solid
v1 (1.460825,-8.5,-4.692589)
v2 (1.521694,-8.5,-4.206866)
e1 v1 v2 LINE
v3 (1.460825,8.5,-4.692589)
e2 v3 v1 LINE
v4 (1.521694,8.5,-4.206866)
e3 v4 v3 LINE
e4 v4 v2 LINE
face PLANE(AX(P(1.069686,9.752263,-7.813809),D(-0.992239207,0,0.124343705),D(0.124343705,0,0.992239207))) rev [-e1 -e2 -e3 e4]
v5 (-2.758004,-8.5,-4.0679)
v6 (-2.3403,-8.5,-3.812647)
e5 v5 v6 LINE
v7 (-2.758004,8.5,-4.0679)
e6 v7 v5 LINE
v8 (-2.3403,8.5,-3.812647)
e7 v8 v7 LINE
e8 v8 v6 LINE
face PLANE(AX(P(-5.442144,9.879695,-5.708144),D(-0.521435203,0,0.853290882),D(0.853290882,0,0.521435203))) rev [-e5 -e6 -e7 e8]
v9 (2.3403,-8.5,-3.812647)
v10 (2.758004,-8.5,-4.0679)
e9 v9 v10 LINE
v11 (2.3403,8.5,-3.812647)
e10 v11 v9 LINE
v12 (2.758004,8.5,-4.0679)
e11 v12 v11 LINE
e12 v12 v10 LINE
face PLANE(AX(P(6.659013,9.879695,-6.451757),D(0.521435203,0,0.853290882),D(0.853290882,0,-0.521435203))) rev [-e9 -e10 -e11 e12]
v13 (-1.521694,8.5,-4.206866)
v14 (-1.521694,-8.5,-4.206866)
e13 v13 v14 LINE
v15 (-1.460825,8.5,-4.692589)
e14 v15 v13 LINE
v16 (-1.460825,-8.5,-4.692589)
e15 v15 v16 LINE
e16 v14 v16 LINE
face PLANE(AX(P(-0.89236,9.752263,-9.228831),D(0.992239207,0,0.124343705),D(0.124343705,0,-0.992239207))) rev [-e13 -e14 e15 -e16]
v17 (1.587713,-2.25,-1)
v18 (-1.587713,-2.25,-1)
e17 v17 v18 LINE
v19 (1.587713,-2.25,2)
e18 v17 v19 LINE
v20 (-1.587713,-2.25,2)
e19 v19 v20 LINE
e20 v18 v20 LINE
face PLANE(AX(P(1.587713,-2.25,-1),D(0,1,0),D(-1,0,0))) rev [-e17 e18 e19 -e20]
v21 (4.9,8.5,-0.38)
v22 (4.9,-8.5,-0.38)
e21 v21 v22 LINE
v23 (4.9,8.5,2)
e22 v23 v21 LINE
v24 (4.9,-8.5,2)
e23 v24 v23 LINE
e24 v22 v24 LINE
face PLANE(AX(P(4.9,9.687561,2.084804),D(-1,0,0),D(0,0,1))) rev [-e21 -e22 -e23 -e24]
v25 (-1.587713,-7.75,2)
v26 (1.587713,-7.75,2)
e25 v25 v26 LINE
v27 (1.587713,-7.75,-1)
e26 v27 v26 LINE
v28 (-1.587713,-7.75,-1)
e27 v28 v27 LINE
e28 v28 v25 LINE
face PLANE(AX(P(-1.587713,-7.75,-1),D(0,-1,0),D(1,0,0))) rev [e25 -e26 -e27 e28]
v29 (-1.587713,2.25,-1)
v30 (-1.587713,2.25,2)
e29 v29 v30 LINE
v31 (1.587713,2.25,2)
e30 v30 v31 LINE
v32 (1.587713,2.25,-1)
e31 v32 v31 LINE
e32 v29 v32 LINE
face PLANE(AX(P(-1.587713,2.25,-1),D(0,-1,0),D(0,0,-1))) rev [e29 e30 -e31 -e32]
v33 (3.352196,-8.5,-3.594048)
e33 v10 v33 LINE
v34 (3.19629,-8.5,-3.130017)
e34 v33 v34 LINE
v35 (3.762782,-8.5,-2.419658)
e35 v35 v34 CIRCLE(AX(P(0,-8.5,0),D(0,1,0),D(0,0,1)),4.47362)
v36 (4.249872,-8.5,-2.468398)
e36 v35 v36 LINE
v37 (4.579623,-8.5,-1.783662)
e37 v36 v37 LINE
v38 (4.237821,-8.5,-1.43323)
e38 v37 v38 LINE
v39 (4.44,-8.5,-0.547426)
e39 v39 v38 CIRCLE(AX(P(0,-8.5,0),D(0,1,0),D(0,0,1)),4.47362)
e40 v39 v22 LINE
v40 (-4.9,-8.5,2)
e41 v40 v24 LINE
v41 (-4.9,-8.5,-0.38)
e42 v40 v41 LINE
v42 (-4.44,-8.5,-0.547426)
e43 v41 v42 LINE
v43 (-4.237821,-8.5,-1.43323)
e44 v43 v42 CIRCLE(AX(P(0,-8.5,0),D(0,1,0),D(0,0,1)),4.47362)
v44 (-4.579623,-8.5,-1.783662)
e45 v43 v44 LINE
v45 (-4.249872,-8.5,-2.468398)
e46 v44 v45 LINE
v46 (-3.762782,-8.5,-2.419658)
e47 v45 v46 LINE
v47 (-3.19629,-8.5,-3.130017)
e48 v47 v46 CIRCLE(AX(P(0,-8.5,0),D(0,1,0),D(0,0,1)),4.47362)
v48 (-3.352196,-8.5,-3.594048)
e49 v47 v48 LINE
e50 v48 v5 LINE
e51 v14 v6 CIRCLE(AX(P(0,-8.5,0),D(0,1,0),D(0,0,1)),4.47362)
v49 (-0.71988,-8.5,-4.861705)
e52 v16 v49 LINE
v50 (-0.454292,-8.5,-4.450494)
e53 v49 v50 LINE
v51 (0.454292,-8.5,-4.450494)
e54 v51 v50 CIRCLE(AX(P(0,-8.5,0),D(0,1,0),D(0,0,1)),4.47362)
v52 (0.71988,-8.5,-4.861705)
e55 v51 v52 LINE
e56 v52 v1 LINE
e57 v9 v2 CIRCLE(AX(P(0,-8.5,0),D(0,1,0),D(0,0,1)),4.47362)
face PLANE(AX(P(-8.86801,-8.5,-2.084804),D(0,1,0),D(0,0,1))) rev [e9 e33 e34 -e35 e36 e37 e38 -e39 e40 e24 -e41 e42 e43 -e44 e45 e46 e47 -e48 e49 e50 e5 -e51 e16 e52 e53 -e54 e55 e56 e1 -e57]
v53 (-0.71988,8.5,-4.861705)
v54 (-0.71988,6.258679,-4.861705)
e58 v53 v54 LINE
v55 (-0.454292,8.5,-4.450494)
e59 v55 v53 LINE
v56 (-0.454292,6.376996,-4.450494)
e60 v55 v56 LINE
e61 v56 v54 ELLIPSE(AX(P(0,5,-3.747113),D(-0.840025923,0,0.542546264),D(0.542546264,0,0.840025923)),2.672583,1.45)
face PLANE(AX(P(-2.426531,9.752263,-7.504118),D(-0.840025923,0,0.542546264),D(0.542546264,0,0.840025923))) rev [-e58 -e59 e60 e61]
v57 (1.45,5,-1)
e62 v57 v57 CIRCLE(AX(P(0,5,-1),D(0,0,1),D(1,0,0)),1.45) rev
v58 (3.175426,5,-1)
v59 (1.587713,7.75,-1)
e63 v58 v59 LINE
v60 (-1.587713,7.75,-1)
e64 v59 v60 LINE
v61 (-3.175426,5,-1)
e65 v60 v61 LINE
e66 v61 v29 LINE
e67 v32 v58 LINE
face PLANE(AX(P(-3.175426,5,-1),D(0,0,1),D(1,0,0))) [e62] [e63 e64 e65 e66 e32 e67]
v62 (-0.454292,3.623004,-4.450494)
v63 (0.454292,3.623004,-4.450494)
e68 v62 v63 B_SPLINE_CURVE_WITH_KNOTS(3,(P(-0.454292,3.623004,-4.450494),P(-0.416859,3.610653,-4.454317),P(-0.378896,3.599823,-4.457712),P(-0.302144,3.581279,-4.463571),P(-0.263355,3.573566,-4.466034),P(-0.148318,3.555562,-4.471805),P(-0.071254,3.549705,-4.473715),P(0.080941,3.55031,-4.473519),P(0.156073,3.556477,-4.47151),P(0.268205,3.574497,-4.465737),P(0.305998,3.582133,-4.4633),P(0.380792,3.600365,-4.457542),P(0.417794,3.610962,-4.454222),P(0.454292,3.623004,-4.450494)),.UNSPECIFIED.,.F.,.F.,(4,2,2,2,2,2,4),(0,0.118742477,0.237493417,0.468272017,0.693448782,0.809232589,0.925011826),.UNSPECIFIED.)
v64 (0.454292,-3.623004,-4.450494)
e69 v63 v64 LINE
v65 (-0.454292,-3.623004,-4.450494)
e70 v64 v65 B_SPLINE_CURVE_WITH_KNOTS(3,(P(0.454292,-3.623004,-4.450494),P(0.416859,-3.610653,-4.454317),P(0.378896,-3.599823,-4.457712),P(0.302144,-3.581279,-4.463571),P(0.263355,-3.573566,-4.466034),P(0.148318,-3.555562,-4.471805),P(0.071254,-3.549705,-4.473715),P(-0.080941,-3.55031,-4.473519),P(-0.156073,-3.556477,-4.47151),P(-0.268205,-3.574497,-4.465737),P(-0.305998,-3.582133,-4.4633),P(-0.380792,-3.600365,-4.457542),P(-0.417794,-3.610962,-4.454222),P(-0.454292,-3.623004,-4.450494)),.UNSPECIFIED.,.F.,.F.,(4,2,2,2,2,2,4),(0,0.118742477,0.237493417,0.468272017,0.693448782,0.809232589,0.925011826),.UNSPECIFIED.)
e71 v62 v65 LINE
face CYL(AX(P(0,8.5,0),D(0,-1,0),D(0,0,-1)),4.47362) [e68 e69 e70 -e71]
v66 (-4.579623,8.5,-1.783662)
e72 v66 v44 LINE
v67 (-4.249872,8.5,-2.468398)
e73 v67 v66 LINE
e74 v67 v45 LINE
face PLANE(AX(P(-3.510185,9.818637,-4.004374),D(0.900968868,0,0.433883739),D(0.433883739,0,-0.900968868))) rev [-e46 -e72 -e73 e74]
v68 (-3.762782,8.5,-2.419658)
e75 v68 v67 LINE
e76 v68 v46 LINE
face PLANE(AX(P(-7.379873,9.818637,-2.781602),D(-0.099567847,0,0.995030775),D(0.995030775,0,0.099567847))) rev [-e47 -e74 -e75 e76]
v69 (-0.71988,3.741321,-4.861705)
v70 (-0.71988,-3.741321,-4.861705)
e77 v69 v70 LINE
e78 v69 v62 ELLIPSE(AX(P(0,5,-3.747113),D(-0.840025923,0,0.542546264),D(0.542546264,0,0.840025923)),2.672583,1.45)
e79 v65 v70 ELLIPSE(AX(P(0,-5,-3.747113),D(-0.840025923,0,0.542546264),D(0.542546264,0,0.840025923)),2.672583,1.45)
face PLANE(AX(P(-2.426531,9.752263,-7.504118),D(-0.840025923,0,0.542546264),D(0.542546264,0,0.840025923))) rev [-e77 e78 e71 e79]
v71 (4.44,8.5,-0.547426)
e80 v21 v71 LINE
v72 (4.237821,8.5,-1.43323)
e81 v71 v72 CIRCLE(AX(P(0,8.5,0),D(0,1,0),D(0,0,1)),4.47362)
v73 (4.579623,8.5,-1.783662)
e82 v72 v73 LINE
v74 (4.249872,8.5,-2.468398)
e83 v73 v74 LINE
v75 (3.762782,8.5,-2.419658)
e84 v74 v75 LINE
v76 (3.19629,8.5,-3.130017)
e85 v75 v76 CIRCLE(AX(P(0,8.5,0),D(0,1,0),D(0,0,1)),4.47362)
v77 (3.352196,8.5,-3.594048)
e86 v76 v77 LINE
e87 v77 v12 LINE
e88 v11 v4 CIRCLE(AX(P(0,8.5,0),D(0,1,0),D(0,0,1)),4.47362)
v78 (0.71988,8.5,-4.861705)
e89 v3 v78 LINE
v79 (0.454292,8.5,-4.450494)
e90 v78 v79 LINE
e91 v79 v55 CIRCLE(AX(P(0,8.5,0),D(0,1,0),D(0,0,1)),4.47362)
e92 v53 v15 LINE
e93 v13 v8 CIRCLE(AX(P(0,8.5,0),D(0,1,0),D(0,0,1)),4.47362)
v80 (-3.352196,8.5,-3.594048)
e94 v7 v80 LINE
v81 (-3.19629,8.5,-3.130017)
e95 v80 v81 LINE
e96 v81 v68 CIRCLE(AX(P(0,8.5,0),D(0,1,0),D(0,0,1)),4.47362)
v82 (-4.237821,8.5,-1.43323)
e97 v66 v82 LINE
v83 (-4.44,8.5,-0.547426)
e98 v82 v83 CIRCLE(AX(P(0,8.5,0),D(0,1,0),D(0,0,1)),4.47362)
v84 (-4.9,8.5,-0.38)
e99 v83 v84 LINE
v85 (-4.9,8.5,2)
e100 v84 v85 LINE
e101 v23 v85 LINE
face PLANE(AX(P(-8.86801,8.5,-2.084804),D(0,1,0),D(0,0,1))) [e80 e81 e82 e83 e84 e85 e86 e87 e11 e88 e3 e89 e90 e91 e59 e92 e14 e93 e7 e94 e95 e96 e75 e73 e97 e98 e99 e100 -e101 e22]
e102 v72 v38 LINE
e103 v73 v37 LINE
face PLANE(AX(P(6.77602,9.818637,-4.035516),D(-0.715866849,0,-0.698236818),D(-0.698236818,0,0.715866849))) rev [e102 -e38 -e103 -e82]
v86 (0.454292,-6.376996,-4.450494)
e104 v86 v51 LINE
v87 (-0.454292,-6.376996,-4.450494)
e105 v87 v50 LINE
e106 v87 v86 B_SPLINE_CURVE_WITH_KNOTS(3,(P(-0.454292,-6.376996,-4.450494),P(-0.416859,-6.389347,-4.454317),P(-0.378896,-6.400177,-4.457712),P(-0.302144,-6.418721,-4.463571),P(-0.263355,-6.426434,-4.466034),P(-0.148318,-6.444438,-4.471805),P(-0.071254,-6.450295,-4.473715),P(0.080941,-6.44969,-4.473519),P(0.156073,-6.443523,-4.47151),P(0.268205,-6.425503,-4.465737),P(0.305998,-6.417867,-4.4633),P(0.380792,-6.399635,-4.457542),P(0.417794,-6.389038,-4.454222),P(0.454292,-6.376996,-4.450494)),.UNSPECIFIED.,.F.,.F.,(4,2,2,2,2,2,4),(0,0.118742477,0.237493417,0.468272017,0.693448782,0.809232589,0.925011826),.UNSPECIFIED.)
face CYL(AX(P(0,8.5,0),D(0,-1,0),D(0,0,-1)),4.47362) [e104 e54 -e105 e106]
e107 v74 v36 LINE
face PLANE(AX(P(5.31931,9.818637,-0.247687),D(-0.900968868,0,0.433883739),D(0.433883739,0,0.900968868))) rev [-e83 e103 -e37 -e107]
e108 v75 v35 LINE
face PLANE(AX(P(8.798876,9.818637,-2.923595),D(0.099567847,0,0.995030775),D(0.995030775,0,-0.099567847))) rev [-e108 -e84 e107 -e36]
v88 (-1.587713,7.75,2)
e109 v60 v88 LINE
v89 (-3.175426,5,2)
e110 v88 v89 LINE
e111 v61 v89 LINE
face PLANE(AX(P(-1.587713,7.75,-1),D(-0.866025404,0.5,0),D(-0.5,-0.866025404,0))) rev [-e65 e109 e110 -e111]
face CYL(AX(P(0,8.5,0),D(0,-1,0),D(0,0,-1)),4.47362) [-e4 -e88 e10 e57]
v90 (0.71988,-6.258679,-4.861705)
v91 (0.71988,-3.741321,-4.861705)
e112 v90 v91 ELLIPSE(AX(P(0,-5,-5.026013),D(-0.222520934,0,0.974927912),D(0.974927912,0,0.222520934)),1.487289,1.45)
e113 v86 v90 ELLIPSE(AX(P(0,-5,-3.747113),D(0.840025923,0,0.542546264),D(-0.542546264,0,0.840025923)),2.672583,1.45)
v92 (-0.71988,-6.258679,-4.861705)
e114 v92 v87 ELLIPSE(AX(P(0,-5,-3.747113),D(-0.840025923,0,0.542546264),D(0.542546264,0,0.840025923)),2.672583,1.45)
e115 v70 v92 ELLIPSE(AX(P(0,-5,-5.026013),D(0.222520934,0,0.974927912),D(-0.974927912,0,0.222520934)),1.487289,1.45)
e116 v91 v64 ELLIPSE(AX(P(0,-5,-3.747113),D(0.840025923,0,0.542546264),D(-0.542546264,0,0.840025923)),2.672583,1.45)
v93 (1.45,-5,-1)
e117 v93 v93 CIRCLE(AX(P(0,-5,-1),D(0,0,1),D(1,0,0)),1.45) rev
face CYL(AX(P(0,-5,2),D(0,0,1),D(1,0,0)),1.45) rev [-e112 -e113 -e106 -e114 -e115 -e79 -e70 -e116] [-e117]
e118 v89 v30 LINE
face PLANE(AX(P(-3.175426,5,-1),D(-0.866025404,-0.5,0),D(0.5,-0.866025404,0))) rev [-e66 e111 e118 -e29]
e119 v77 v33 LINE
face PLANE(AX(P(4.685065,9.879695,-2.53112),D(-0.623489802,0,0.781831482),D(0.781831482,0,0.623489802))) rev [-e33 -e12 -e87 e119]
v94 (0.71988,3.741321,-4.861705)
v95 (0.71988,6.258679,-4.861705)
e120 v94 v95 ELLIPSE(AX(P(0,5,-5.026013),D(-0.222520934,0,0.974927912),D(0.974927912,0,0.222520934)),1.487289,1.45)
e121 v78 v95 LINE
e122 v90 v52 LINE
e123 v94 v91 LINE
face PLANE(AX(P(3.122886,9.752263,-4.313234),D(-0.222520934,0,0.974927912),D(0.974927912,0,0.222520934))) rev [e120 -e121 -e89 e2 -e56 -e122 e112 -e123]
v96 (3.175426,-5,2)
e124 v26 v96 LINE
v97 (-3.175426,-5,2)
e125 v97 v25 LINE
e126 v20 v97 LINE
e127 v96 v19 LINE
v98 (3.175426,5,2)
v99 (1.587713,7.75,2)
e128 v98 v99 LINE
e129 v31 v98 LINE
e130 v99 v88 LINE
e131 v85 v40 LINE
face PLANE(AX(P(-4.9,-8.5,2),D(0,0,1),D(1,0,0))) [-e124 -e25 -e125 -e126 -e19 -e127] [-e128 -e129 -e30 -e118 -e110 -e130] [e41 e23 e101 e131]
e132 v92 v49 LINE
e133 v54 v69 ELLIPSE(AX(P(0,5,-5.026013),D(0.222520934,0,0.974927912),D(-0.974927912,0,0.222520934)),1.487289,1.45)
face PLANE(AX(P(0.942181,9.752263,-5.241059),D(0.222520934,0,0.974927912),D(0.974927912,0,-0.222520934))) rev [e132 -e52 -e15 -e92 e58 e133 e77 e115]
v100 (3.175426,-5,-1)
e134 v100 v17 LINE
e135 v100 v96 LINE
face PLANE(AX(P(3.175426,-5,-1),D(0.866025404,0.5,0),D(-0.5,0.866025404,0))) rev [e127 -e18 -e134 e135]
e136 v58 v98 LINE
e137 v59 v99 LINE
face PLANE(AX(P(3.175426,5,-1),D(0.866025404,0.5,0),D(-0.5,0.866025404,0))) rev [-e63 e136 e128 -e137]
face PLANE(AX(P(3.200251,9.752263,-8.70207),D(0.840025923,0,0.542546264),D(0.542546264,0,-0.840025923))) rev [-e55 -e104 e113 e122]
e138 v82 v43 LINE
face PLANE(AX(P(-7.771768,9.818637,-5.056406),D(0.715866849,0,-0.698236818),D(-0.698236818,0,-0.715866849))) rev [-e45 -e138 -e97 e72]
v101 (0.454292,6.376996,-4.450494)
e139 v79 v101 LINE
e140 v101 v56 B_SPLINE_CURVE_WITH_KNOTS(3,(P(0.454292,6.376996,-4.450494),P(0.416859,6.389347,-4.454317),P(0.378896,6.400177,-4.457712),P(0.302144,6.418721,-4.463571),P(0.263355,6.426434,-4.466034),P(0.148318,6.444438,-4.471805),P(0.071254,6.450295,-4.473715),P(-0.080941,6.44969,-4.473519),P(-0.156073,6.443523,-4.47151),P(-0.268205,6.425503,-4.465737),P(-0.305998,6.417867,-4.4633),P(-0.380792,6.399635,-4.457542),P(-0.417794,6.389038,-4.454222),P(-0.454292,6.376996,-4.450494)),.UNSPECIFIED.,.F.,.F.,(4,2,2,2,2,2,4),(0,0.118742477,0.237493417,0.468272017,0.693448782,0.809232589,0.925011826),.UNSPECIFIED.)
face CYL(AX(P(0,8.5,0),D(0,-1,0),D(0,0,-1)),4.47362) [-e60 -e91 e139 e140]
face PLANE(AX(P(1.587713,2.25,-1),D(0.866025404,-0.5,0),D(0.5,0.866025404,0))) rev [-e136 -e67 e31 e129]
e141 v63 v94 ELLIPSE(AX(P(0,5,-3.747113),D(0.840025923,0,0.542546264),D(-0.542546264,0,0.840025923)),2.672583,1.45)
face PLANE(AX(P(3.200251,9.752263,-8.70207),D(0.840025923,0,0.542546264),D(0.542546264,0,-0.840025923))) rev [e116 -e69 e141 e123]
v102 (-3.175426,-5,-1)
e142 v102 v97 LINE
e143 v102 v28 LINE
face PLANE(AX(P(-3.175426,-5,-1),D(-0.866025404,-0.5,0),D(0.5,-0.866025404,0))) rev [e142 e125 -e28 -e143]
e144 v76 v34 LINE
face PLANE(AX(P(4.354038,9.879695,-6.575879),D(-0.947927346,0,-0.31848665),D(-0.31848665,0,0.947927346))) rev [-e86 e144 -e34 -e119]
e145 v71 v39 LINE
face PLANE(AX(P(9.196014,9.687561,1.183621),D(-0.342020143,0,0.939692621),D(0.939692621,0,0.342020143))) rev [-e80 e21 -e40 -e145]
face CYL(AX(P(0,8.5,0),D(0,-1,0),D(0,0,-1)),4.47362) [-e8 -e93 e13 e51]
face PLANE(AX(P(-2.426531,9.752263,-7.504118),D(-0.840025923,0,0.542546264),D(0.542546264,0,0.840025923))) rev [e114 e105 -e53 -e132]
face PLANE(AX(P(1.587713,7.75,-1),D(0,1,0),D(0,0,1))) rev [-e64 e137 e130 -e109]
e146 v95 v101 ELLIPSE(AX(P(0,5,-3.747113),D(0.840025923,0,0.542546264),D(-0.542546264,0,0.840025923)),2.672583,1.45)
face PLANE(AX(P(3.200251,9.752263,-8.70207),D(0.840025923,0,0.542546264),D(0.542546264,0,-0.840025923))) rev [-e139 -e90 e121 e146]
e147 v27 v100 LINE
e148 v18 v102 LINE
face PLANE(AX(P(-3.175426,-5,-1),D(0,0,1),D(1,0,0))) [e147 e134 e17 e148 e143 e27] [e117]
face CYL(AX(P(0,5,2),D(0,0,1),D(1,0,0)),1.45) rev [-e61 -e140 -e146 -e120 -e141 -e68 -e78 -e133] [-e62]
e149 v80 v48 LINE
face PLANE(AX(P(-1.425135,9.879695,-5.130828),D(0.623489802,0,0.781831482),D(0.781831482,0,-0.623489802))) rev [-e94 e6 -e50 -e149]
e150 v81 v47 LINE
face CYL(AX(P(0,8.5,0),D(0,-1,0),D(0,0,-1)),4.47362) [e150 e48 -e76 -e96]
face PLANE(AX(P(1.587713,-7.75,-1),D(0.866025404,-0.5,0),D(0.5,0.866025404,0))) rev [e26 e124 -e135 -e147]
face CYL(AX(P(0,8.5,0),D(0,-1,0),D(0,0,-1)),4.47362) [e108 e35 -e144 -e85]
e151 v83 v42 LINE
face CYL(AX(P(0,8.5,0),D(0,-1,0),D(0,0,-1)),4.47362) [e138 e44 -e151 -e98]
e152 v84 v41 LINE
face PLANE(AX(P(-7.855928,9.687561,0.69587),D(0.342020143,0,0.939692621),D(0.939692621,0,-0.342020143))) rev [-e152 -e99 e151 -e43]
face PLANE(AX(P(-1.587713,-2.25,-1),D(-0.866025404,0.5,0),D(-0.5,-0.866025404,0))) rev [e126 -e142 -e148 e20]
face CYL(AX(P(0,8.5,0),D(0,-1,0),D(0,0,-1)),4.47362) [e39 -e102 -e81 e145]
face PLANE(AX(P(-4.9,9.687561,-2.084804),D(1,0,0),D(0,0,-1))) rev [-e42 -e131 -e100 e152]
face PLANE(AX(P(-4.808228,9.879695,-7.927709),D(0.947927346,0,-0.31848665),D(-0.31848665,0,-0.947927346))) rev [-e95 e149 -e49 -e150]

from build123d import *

# Parameters (mm, degrees)
BOSS_EXTRUDE1_DEPTH             = 8.5
BOSS_EXTRUDE2_REACH             = 12.596
BOSS_EXTRUDE2_DIRECTION_2_REACH = 12.596
CIRPATTERN1_START               = -8.5
CIRPATTERN1_DEPTH               = 17
CUT_EXTRUDE1_DEPTH              = 19.347920123
CUT_EXTRUDE1_DEPTH_BACK         = 19.347920123
SKETCH10_W                      = 9.8
SKETCH10_H                      = 17
BOSS_EXTRUDE3_DEPTH             = 2
M2_5_CLEARANCE_HOLE1_D          = 2.9
CUT_EXTRUDE2_DEPTH              = 3


# Read off the part's stored shape, not the designer's step: CirPattern1
with BuildPart() as part:
    # Sketch1 → Boss-Extrude1 (new, symmetric)
    with BuildSketch(Plane(origin=(0, 0, 0), x_dir=(1, 0, 0), z_dir=(0, 1, 0))):
        with BuildLine():
            ThreePointArc((-4.44, 0.547426308), (-4.465207061, 0.274228857), (-4.473619962, 0))
            Line((-4.473619962, 0), (-4.44, 0))
            Line((-4.44, 0), (-4.44, 0.547426308))
        make_face()
        with BuildLine():
            Line((-4.44, 0.547426308), (-4.44, 0))
            Line((-4.44, 0), (4.473619962, 0))
            ThreePointArc((4.473619962, 0), (0.274228857, 4.465207061), (-4.44, 0.547426308))
        make_face()
    extrude(amount=BOSS_EXTRUDE1_DEPTH, both=True)

    # Boss-Extrude2: up to this face of the body (flat: up to its plane)
    boss_extrude2_end = Plane(part.part.faces().sort_by_distance((0, 8.5, -1.898663281))[0])
    # Sketch1<3> → Boss-Extrude2 (add, up to the picked face)
    with BuildSketch(Plane(origin=(0, 0, 0), x_dir=(1, 0, 0), z_dir=(0, 1, 0)), mode=Mode.PRIVATE) as boss_extrude2_sk1:
        Polygon((-4.44, 0.547426308), (-4.44, -0.547426308), (-4.9, -0.38), (-4.9, 0.38), align=None)
    boss_extrude2_tool1 = split(extrude(boss_extrude2_sk1.sketch, amount=BOSS_EXTRUDE2_REACH, mode=Mode.PRIVATE), bisect_by=boss_extrude2_end, keep=Keep.BOTH, mode=Mode.PRIVATE)
    # Sketch1<3> → Boss-Extrude2 (add, up to the picked face)
    with BuildSketch(Plane(origin=(0, 0, 0), x_dir=(1, 0, 0), z_dir=(0, 1, 0)), mode=Mode.PRIVATE) as boss_extrude2_sk2:
        with BuildLine():
            Line((-4.473619962, 0), (4.473619962, 0))
            ThreePointArc((4.473619962, 0), (0, 4.473619962), (-4.473619962, 0))
        make_face()
    boss_extrude2_tool2 = split(extrude(boss_extrude2_sk2.sketch, amount=BOSS_EXTRUDE2_REACH, mode=Mode.PRIVATE), bisect_by=boss_extrude2_end, keep=Keep.BOTH, mode=Mode.PRIVATE)
    add(boss_extrude2_tool1.solids().sort_by(Axis((-4.65616, 0, 0), (0, 1, 0)))[0])
    add(boss_extrude2_tool2.solids().sort_by(Axis((0, 0, -1.898663), (0, 1, 0)))[0])

    # Boss-Extrude2 direction 2: up to this face of the body (flat: up to its plane)
    boss_extrude2_direction_2_end = Plane(part.part.faces().sort_by_distance((0, -8.5, -1.898663281))[0])
    # Sketch1<3> → Boss-Extrude2 direction 2 (add, up to the picked face)
    with BuildSketch(Plane(origin=(0, 0, 0), x_dir=(1, 0, 0), z_dir=(0, 1, 0)), mode=Mode.PRIVATE) as boss_extrude2_direction_2_sk1:
        Polygon((-4.44, 0.547426308), (-4.44, -0.547426308), (-4.9, -0.38), (-4.9, 0.38), align=None)
    boss_extrude2_direction_2_tool1 = split(extrude(boss_extrude2_direction_2_sk1.sketch, amount=-BOSS_EXTRUDE2_DIRECTION_2_REACH, mode=Mode.PRIVATE), bisect_by=boss_extrude2_direction_2_end, keep=Keep.BOTH, mode=Mode.PRIVATE)
    # Sketch1<3> → Boss-Extrude2 direction 2 (add, up to the picked face)
    with BuildSketch(Plane(origin=(0, 0, 0), x_dir=(1, 0, 0), z_dir=(0, 1, 0)), mode=Mode.PRIVATE) as boss_extrude2_direction_2_sk2:
        with BuildLine():
            Line((-4.473619962, 0), (4.473619962, 0))
            ThreePointArc((4.473619962, 0), (0, 4.473619962), (-4.473619962, 0))
        make_face()
    boss_extrude2_direction_2_tool2 = split(extrude(boss_extrude2_direction_2_sk2.sketch, amount=-BOSS_EXTRUDE2_DIRECTION_2_REACH, mode=Mode.PRIVATE), bisect_by=boss_extrude2_direction_2_end, keep=Keep.BOTH, mode=Mode.PRIVATE)
    add(boss_extrude2_direction_2_tool1.solids().sort_by(Axis((-4.65616, 0, 0), (0, -1, 0)))[0])
    add(boss_extrude2_direction_2_tool2.solids().sort_by(Axis((0, 0, -1.898663), (0, -1, 0)))[0])

    # CirPattern1 outline → CirPattern1 (add)
    with BuildSketch(Plane(origin=(0, 0, 0), x_dir=(1, 0, 0), z_dir=(0, 1, 0)).offset(CIRPATTERN1_START)):
        with BuildLine():
            Line((4.9, 0.38), (4.44, 0.547426308))
            ThreePointArc((4.44, 0.547426308), (4.465207061, 0.274228857), (4.473619962, 0))
            ThreePointArc((4.473619962, 0), (4.465207061, -0.274228857), (4.44, -0.547426308))
            Line((4.44, -0.547426308), (4.9, -0.38))
            Line((4.9, -0.38), (4.9, 0.38))
        make_face()
        with BuildLine():
            Line((4.249871632, 2.468398491), (3.762782401, 2.419657862))
            ThreePointArc((3.762782401, 2.419657862), (4.030592313, 1.941030956), (4.237821147, 1.433229741))
            Line((4.237821147, 1.433229741), (4.579623274, 1.783662152))
            Line((4.579623274, 1.783662152), (4.249871632, 2.468398491))
        make_face()
        with BuildLine():
            Line((2.758004066, 4.067900389), (2.340299599, 3.812646502))
            ThreePointArc((2.340299599, 3.812646502), (2.789256424, 3.497616927), (3.196289842, 3.130017062))
            Line((3.196289842, 3.130017062), (3.352195992, 3.594048139))
            Line((3.352195992, 3.594048139), (2.758004066, 4.067900389))
        make_face()
        with BuildLine():
            Line((0.71987997, 4.861704725), (0.454291759, 4.450493744))
            ThreePointArc((0.454291759, 4.450493744), (0.995474092, 4.361456969), (1.521694134, 4.206866117))
            Line((1.521694134, 4.206866117), (1.460825183, 4.692588815))
            Line((1.460825183, 4.692588815), (0.71987997, 4.861704725))
        make_face()
        with BuildLine():
            Line((-1.460825183, 4.692588815), (-1.521694134, 4.206866117))
            ThreePointArc((-1.521694134, 4.206866117), (-0.995474092, 4.361456969), (-0.454291759, 4.450493744))
            Line((-0.454291759, 4.450493744), (-0.71987997, 4.861704725))
            Line((-0.71987997, 4.861704725), (-1.460825183, 4.692588815))
        make_face()
        with BuildLine():
            Line((-3.352195992, 3.594048139), (-3.196289842, 3.130017062))
            ThreePointArc((-3.196289842, 3.130017062), (-2.789256424, 3.497616927), (-2.340299599, 3.812646502))
            Line((-2.340299599, 3.812646502), (-2.758004066, 4.067900389))
            Line((-2.758004066, 4.067900389), (-3.352195992, 3.594048139))
        make_face()
        with BuildLine():
            Line((-3.7627824, 2.419657862), (-4.249871632, 2.468398491))
            Line((-4.249871632, 2.468398491), (-4.579623274, 1.783662152))
            Line((-4.579623274, 1.783662152), (-4.237821147, 1.433229741))
            ThreePointArc((-4.237821147, 1.433229741), (-4.030592312, 1.941030956), (-3.7627824, 2.419657862))
        make_face()
    extrude(amount=CIRPATTERN1_DEPTH)

    # Sketch4 → Cut-Extrude1 (cut, two sides: drawn at the far end of the back side and taken through both)
    with BuildSketch(Plane(origin=(0, 8.5, 0), x_dir=(1, 0, 0), z_dir=(0, 1, 0)).offset(-CUT_EXTRUDE1_DEPTH_BACK)):
        Polygon((-36.779321089, 0), (-4.9, 0), (4.9, 0), (36.779321089, 0), (36.779321089, -63.758642179), (-36.779321089, -63.758642179), align=None)
    extrude(amount=CUT_EXTRUDE1_DEPTH + CUT_EXTRUDE1_DEPTH_BACK, mode=Mode.SUBTRACT)

    # Sketch10 → Boss-Extrude3 (add)
    with BuildSketch(Plane.XY):
        Rectangle(SKETCH10_W, SKETCH10_H)
    extrude(amount=BOSS_EXTRUDE3_DEPTH)

    # M2.5 Clearance Hole1 (through all)
    with Locations(Plane(origin=(-2.188156234, 1.776538328, 2), x_dir=(1, 0, 0), z_dir=(0, 0, 1))):
        with Locations((2.188156234, 3.223461672), (2.188156234, -6.776538328)):
            Hole(M2_5_CLEARANCE_HOLE1_D / 2)

    # Sketch9 → Cut-Extrude2 (cut)
    with BuildSketch(Plane.XY.offset(2)):
        Polygon((-3.175426481, 5), (-1.58771324, 2.25), (1.58771324, 2.25), (3.175426481, 5), (1.58771324, 7.75), (-1.58771324, 7.75), align=None)
        Polygon((-3.175426481, -5), (-1.58771324, -7.75), (1.58771324, -7.75), (3.175426481, -5), (1.58771324, -2.25), (-1.58771324, -2.25), align=None)
    extrude(amount=-CUT_EXTRUDE2_DEPTH, mode=Mode.SUBTRACT)


solid = part.part
